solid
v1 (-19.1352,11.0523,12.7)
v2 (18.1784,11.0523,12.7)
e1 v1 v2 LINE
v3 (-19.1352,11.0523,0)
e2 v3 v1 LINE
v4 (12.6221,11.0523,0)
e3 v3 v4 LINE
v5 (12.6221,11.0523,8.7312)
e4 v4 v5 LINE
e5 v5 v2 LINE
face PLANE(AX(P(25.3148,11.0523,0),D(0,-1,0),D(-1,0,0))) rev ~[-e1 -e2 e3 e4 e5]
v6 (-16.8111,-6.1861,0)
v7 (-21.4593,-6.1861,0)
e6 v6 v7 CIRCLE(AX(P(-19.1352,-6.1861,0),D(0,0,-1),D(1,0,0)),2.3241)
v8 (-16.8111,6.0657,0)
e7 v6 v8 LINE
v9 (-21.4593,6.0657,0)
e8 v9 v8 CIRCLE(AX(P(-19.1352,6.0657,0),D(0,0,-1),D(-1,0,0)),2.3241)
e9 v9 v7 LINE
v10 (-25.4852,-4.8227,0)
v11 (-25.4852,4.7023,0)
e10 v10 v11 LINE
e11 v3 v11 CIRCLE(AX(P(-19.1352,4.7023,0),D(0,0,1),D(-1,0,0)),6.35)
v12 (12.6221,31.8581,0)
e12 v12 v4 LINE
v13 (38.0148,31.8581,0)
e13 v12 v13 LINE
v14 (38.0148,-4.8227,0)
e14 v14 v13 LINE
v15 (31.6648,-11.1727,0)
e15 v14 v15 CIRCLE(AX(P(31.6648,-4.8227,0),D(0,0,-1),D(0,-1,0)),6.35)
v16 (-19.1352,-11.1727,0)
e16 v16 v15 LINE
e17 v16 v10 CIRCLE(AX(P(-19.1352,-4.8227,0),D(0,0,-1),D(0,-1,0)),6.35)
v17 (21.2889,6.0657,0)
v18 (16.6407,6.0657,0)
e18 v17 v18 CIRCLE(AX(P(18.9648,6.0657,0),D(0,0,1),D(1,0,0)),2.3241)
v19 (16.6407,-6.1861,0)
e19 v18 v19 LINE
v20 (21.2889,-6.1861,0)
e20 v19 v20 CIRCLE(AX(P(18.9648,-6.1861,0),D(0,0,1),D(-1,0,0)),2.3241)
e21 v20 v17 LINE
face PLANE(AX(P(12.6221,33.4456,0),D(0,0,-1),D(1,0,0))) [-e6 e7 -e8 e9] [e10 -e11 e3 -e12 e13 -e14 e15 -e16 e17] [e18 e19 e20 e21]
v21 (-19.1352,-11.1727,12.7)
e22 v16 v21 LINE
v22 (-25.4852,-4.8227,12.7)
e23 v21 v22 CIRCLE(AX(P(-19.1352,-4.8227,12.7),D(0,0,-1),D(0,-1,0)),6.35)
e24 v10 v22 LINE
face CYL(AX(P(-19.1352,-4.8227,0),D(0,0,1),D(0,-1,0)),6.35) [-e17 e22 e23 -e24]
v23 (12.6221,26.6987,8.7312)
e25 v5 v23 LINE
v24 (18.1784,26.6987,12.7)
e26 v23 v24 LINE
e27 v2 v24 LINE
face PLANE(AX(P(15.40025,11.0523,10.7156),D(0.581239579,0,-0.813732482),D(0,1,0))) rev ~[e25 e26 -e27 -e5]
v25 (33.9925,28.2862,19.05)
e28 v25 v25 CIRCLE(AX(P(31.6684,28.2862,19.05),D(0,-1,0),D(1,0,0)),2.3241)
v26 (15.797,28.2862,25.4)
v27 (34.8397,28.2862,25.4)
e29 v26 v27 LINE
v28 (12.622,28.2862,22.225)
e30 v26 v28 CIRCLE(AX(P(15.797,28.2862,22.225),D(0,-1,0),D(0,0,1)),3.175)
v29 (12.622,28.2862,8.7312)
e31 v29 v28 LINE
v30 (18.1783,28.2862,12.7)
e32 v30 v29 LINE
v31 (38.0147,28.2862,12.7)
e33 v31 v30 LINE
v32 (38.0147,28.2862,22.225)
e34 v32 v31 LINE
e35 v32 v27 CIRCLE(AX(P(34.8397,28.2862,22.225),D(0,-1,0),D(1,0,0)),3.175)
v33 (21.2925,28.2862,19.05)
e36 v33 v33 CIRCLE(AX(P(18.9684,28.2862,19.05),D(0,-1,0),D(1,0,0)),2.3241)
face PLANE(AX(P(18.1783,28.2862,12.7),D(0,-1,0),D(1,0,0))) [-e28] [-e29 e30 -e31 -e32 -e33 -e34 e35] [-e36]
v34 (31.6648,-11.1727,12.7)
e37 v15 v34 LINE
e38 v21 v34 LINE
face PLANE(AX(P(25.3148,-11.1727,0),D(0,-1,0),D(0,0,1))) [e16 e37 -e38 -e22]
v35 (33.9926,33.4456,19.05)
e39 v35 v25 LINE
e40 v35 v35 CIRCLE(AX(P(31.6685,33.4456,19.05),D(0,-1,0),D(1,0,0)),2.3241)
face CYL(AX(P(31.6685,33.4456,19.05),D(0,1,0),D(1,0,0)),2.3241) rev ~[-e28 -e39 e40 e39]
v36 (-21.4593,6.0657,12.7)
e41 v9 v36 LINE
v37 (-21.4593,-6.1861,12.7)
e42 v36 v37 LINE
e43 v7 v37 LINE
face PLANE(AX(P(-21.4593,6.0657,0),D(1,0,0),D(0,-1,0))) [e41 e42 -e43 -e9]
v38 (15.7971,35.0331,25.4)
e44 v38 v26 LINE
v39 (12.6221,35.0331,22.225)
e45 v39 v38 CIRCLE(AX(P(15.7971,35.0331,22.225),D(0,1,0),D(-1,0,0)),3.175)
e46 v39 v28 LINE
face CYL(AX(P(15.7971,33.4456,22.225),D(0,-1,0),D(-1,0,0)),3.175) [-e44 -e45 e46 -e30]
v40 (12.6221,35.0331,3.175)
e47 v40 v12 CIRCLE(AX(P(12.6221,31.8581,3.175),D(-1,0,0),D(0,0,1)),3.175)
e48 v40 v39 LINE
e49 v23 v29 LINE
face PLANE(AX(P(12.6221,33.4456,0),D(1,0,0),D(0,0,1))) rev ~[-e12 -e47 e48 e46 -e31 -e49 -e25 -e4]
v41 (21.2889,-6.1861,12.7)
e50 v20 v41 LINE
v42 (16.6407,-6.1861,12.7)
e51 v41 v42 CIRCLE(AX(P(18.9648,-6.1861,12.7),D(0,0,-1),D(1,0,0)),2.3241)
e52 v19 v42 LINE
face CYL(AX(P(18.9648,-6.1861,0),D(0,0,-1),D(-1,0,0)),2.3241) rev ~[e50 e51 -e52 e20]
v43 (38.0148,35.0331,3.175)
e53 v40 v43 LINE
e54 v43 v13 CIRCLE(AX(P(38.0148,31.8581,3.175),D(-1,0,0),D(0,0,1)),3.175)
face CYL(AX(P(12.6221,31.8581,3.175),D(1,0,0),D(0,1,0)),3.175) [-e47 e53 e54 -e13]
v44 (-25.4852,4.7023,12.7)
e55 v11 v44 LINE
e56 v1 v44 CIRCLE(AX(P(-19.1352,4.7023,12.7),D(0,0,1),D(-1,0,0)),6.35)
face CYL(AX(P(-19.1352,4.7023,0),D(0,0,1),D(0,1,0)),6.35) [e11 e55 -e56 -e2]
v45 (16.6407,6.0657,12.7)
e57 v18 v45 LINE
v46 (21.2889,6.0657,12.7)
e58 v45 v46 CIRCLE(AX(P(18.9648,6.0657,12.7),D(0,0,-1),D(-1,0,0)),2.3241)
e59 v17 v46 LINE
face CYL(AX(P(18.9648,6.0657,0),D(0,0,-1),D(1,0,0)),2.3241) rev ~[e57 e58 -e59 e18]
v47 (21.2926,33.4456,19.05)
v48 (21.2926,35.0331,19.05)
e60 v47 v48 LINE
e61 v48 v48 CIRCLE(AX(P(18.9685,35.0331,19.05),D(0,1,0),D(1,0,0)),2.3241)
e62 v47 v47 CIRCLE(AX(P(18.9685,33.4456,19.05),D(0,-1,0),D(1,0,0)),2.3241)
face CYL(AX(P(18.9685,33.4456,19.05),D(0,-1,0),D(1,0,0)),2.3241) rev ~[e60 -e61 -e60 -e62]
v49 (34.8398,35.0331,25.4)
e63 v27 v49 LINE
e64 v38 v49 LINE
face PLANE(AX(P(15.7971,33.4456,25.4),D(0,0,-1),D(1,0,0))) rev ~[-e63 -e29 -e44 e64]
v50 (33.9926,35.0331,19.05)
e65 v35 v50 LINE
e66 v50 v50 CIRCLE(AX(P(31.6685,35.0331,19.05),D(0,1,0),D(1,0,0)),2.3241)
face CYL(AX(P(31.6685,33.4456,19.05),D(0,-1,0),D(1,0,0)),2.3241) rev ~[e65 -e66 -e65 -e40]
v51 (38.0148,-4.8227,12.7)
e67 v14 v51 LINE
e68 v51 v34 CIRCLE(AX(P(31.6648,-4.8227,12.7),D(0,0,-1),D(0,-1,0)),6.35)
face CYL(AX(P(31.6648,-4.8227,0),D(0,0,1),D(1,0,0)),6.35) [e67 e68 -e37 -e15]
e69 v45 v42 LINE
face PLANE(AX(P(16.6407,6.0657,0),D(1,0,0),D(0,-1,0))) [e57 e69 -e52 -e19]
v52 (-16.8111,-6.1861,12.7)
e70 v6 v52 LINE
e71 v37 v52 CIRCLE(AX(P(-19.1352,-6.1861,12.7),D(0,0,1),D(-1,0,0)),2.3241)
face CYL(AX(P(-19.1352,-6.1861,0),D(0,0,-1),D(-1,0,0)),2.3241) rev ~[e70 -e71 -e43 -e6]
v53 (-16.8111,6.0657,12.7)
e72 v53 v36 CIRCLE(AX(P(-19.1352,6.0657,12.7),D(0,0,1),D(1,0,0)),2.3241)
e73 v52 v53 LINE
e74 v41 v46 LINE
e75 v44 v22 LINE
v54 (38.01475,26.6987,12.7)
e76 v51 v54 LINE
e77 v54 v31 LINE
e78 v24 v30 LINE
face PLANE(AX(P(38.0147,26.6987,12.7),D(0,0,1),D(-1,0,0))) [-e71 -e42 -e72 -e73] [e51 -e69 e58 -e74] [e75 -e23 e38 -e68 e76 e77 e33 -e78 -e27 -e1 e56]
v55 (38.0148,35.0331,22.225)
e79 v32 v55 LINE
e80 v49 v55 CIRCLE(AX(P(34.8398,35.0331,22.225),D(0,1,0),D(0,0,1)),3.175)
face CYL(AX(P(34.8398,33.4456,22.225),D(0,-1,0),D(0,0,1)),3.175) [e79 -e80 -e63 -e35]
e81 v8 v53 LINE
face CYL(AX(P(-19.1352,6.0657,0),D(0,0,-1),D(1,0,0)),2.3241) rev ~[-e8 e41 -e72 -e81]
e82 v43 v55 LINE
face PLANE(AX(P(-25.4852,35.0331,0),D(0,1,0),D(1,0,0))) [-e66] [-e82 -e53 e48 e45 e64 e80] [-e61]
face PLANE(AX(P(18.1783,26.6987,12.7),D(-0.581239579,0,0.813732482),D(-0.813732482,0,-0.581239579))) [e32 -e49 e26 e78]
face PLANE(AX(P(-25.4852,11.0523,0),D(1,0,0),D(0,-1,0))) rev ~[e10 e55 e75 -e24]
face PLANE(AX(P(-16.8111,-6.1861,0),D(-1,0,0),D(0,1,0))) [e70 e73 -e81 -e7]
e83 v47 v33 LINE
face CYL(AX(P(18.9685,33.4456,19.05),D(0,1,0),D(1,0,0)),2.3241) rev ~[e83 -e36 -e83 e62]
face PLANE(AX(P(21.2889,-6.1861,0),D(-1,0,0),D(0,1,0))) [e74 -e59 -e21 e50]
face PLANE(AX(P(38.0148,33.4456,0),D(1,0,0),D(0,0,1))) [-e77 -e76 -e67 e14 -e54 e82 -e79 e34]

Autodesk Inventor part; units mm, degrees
ref_plane "YZ Plane" through (0, 0, 0) normal (1, 0, 0) x (0, 1, 0)
ref_plane "XZ Plane" through (0, 0, 0) normal (0, 1, 0) x (-1, 0, 0)
ref_plane "XY Plane" through (0, 0, 0) normal (0, 0, 1) x (1, 0, 0)
sketch "Sketch1" plane through (0, 0, 0) normal (0, 0, 1) x (1, 0, 0)
  line L0 (-19.1352, -8.5102) -> (-19.1352, 8.3898) construction
  line L1 (-16.8111, -6.1861) -> (-16.8111, 6.0657)
  line L2 (-21.4593, 6.0657) -> (-21.4593, -6.1861)
  arc A0 (-21.4593, -6.1861) -> (-16.8111, -6.1861) centre (-19.1352, -6.1861) ccw
  arc A1 (-16.8111, 6.0657) -> (-21.4593, 6.0657) centre (-19.1352, 6.0657) ccw
  line L3 (18.9648, -8.5102) -> (18.9648, 8.3898) construction
  line L4 (21.2889, -6.1861) -> (21.2889, 6.0657)
  line L5 (16.6407, 6.0657) -> (16.6407, -6.1861)
  arc A2 (16.6407, -6.1861) -> (21.2889, -6.1861) centre (18.9648, -6.1861) ccw
  arc A3 (21.2889, 6.0657) -> (16.6407, 6.0657) centre (18.9648, 6.0657) ccw
  line L6 (-19.1352, 8.3898) -> (18.9648, 8.3898)
  line L7 (18.9648, -8.5102) -> (-19.1352, -8.5102)
  line L8 (25.3148, 11.0523) -> (-25.4852, 11.0523)
  line L9 (-25.4852, 11.0523) -> (-25.4852, -11.1727)
  line L10 (-25.4852, -11.1727) -> (25.3148, -11.1727)
  line L11 (25.3148, -11.1727) -> (25.3148, 11.0523)
  line L12 (25.3148, 11.0523) -> (-25.4852, -11.1727) construction
  line L13 (-25.4852, 11.0523) -> (25.3148, -11.1727) construction
  point P0 (0, 0)
  point P1 (-0.0852, -0.0602)
  point P2 (-19.1352, -0.0602)
  point P3 (18.9648, -0.0602)
  dimension "d0" = 4.6482
  dimension "d1" = 4.6482
  dimension "d2" = 50.8
  dimension "d3" = 22.225
extrude "Extrusion1" add sketch "Sketch1" along normal blind 12.7 contours L1 A1 L6 A3 L5 A2 L7 A0 | L11 L10 L9 L8
sketch "Sketch2" plane through (-25.4852, 11.0523, 0) normal (0, 1, 0) x (1, 0, 0)
  line L0 (0, 0) -> (50.8, 0) projected
  line L1 (0, 0) -> (12.7, 0)
  line L2 (12.7, 0) -> (12.7, -12.7)
  line L3 (12.7, -12.7) -> (0, -12.7)
  line L4 (0, -12.7) -> (0, 0)
  line L5 (50.8073, 0) -> (38.1073, 0)
  line L6 (38.1073, 0) -> (38.1073, -12.7)
  line L7 (38.1073, -12.7) -> (50.8073, -12.7)
  line L8 (50.8, 0) -> (50.8, -12.7) projected
  line L9 (50.8, 0) -> (50.8, -12.7) projected
  line L10 (50.8, -12.7) -> (50.8, 0)
  line L11 (50.8, 0) -> (38.1073, 0)
  point P0 (25.4852, 0)
  dimension "d7" = 12.7
  dimension "d8" = 12.7
  dimension "d9" = 12.7
  dimension "d10" = 12.7
extrude "Extrusion2" add sketch "Sketch2" along normal blind 22.3933
chamfer "Chamfer1" distance 3.9688 distance2 5.5563 1 edges at (12.6221, 22.2489, 12.7) measured on face at (12.6221, 18.5167, 4.2333)
chamfer "Chamfer2" distance 4.7625 distance2 7.9375 1 edges at (-12.7852, 22.2489, 0) measured on face at (-12.7852, 18.5167, 8.4667)
sketch "Sketch3" plane through (-25.4852, 33.4456, 0) normal (0, 1, 0) x (1, 0, 0)
  line L0 (0, 0) -> (6.319, 0)
  line L1 (38.1073, 0) -> (4.7625, 0) projected
  line L2 (6.319, -0.6519) -> (0, -0.6519)
  line L3 (0, 0) -> (0, -12.7) projected
  line L4 (0, 0) -> (0, -0.6519)
  line L5 (6.319, 0) -> (6.319, -0.6519)
  point P0 (25.4852, 0)
extrude "Extrusion3" cut sketch "Sketch3" against normal up to surface (22.3933 mm away)
fillet "Fillet2" radius 3.175 2 edges at (-19.6363, 22.2489, 0.6519) (-25.4852, 22.2489, 0.6519)
sketch "Sketch4" plane through (0, 0, 12.7) normal (0, 0, 1) x (1, 0, 0)
  line L0 (-12.7852, 11.0523) -> (-18.8822, 11.0523) projected
  line L1 (-12.7852, 11.0523) -> (-12.7852, 26.6987)
  line L2 (-12.7852, 33.4456) -> (-12.7852, 11.0523) projected
  line L3 (-12.7852, 11.0523) -> (25.3148, 11.0523)
  line L4 (25.3148, -11.1727) -> (25.3148, 33.4456) projected
  line L5 (25.3148, 11.0523) -> (25.3148, 26.6987)
  line L6 (12.6221, 33.4456) -> (12.6221, 11.0523) projected
  line L7 (-25.4852, -11.1727) -> (-25.4852, 33.4456) projected
  line L8 (25.3148, 26.6987) -> (12.6221, 26.6987)
  line L9 (12.6221, 26.6987) -> (12.6221, 36.2237)
  line L10 (25.3148, 36.2237) -> (25.3148, 26.6987)
  line L11 (-12.7852, 26.6987) -> (-25.4852, 26.6987)
  line L12 (-25.4852, 26.6987) -> (-25.4852, 36.2237)
  line L13 (-12.7852, 36.2237) -> (-12.7852, 26.6987)
  line L14 (18.1783, 33.4456) -> (12.6221, 33.4456) projected
  line L15 (25.3148, 33.4456) -> (12.6221, 33.4456)
  line L16 (-12.7852, 36.2237) -> (-12.7852, 33.4456)
  line L17 (-25.4852, 33.4456) -> (-12.7852, 33.4456) projected
  line L18 (-12.7852, 33.4456) -> (-25.4852, 33.4456)
  line L19 (-25.4852, 33.4456) -> (-25.4852, 36.2237)
  line L20 (12.6221, 33.4456) -> (12.6221, 26.6987)
  line L21 (25.3148, 26.6987) -> (25.3148, 33.4456)
  line L22 (-12.7852, 26.6987) -> (-12.7852, 33.4456)
  line L23 (-25.4852, 26.6987) -> (-25.4852, 33.4456)
  point P0 (0, 0)
  dimension "d22" = 15.6464
extrude "Extrusion4" add sketch "Sketch4" along normal blind 12.7 contours L2 L11 L7 L17 | L6 L14 L15 L4 L8
extrude "Extrusion5" add sketch "Sketch4" against normal blind 4.2333 contours L6 L14 L15 L4 L8
sketch "Sketch5" plane through (-25.4852, 33.4456, 0) normal (0, 1, 0) x (1, 0, 0)
  line L0 (50.8, -25.4) -> (38.1073, -25.4) projected
  line L1 (12.7, -25.4) -> (0, -25.4) projected
  line L2 (44.4537, -25.4) -> (44.4537, -19.05)
  line L3 (6.35, -25.4) -> (6.35, -19.05)
  circle A0 centre (6.35, -19.05) radius 2.3241
  circle A1 centre (44.4537, -19.05) radius 2.3241
  point P0 (25.4852, 0)
  dimension "d27" = 6.35
  dimension "d28" = 6.35
  dimension "d29" = 4.6482
  dimension "d30" = 4.6482
extrude "Extrusion6" cut sketch "Sketch5" against normal through all
sketch "Sketch6" plane through (-12.7852, 11.0523, 12.7) normal (1, 0, 0) x (0, 0, -1)
  line L0 (-12.7, 15.6464) -> (-12.7, 22.3933) projected
  line L1 (0, 15.6464) -> (-12.7, 15.6464) projected
  line L2 (-12.7, 15.6464) -> (-12.7, 22.3933)
  line L3 (-12.7, 22.3933) -> (0, 22.3933)
  line L4 (0, 22.3933) -> (0, 15.6464)
  line L5 (0, 15.6464) -> (-12.7, 15.6464)
  point P0 (12.7, -11.0523)
extrude "Extrusion7" [suppressed]
sketch "Sketch7" plane through (18.1783, 26.6987, 12.7) normal (0, -1, 0) x (1, 0, 0)
  circle A0 centre (-37.3136, 6.35) radius 2.3241 projected
  circle A1 centre (0.7901, 6.35) radius 2.3241 projected
  line L0 (-37.3136, 6.35) -> (-24.6136, 6.35)
  line L1 (-24.6136, 6.35) -> (-11.9136, 6.35)
  line L2 (-26.798, 4.1656) -> (-22.4292, 4.1656)
  line L3 (-22.4292, 4.1656) -> (-22.4292, 8.5344)
  line L4 (-22.4292, 8.5344) -> (-26.798, 8.5344)
  line L5 (-26.798, 8.5344) -> (-26.798, 4.1656)
  line L6 (-26.798, 4.1656) -> (-22.4292, 8.5344) construction
  line L7 (-22.4292, 4.1656) -> (-26.798, 8.5344) construction
  line L8 (-9.7292, 8.5344) -> (-14.098, 8.5344)
  line L9 (-9.7292, 4.1656) -> (-9.7292, 8.5344)
  line L10 (-14.098, 4.1656) -> (-9.7292, 4.1656)
  line L11 (-14.098, 8.5344) -> (-14.098, 4.1656)
  point P0 (-18.1783, -12.7)
  dimension "d35" = 12.7
  dimension "d36" = 12.7
  dimension "d37" = 4.3688
  dimension "d38" = 4.3688
  dimension "d41" = 12.7
extrude "Extrusion8" [suppressed]
fillet "Fillet3" [suppressed]
sketch "Sketch8" plane through (-25.4852, 11.0523, 0) normal (0, 1, 0) x (1, 0, 0)
  line L0 (38.1073, 0) -> (0, 0) projected
  line L1 (0, 0) -> (14.6548, 0)
  line L2 (14.6548, 0) -> (14.6548, -26.951)
  line L3 (14.6548, -26.951) -> (0, -26.951)
  line L4 (0, -26.951) -> (0, 0)
  point P0 (25.4852, 0)
  point P1 (14.6548, 0)
extrude "Extrusion9" cut sketch "Sketch8" along normal blind 25.4
sketch "Sketch9" plane through (25.3148, -11.1727, 12.7) normal (1, 0, 0) x (0, 0, -1)
  line L0 (0, 0) -> (0, 37.8714) projected
  line L1 (12.7, 0) -> (0, 0) projected
  line L2 (12.7, 0) -> (12.7, 44.6183) projected
  line L3 (12.7, 44.6183) -> (-12.7, 44.6183) projected
  line L4 (-12.7, 37.8714) -> (-12.7, 44.6183) projected
  line L5 (0, 37.8714) -> (-12.7, 37.8714) projected
  point P0 (12.7, 11.1727)
extrude "Extrusion10" add sketch "Sketch9" along normal blind 12.7
sketch "Sketch10" plane through (-25.4852, 33.4456, 0) normal (0, 1, 0) x (1, 0, 0)
  circle A0 centre (44.4537, -19.05) radius 2.3241 projected
  line L0 (44.4537, -19.05) -> (57.1537, -19.05)
  circle A1 centre (57.1537, -19.05) radius 2.3241
  point P0 (25.4852, 0)
  dimension "d58" = 12.7
  dimension "d59" = 4.6482
extrude "Extrusion11" cut sketch "Sketch10" against normal blind 12.7 contours A1
fillet "Fillet9" radius 3.175 2 edges at (12.6221, 30.0721, 25.4) (38.0148, 30.0721, 25.4)
fillet "Fillet10" radius 6.35 3 edges at (-25.4852, 11.0523, 6.35) (-25.4852, -11.1727, 6.35) (38.0148, -11.1727, 6.35)
sketch "Sketch11" plane through (-25.4852, 33.4456, 0) normal (0, 1, 0) x (1, 0, 0)
  arc A0 (60.325, -25.4) -> (63.5, -22.225) centre (60.325, -22.225) ccw projected
  line L0 (63.5, 0) -> (63.5, -22.225) projected
  line L1 (38.1073, 0) -> (63.5, 0) projected
  line L2 (38.1073, 0) -> (38.1073, -22.225) projected
  arc A1 (38.1073, -22.225) -> (41.2823, -25.4) centre (41.2823, -22.225) ccw projected
  line L3 (41.2823, -25.4) -> (60.325, -25.4) projected
  circle A2 centre (57.1537, -19.05) radius 2.3241 projected
  circle A3 centre (44.4537, -19.05) radius 2.3241 projected
  point P0 (25.4852, 0)
extrude "Extrusion12" add sketch "Sketch11" along normal blind 1.5875
sketch "Sketch12" plane through (18.1783, 26.6987, 12.7) normal (0, -1, 0) x (1, 0, 0)
  circle A0 centre (13.4901, 6.35) radius 2.3241 projected
  circle A1 centre (0.7901, 6.35) radius 2.3241 projected
  arc A2 (19.8364, 9.525) -> (16.6614, 12.7) centre (16.6614, 9.525) ccw projected
  line L0 (-2.3813, 12.7) -> (16.6614, 12.7) projected
  arc A3 (-2.3813, 12.7) -> (-5.5563, 9.525) centre (-2.3813, 9.525) ccw projected
  line L1 (-5.5563, -3.9688) -> (-5.5563, 9.525) projected
  line L2 (0, 0) -> (-5.5563, -3.9688) projected
  line L3 (19.8364, 0) -> (0, 0) projected
  line L4 (19.8364, 9.525) -> (19.8364, 0) projected
  point P0 (-18.1783, -12.7)
extrude "Extrusion13" cut sketch "Sketch12" against normal blind 1.5875
fillet "Fillet12" radius 3.175 1 edges at (25.3184, 35.0331, 0)
properties part number "Optical Mount"
